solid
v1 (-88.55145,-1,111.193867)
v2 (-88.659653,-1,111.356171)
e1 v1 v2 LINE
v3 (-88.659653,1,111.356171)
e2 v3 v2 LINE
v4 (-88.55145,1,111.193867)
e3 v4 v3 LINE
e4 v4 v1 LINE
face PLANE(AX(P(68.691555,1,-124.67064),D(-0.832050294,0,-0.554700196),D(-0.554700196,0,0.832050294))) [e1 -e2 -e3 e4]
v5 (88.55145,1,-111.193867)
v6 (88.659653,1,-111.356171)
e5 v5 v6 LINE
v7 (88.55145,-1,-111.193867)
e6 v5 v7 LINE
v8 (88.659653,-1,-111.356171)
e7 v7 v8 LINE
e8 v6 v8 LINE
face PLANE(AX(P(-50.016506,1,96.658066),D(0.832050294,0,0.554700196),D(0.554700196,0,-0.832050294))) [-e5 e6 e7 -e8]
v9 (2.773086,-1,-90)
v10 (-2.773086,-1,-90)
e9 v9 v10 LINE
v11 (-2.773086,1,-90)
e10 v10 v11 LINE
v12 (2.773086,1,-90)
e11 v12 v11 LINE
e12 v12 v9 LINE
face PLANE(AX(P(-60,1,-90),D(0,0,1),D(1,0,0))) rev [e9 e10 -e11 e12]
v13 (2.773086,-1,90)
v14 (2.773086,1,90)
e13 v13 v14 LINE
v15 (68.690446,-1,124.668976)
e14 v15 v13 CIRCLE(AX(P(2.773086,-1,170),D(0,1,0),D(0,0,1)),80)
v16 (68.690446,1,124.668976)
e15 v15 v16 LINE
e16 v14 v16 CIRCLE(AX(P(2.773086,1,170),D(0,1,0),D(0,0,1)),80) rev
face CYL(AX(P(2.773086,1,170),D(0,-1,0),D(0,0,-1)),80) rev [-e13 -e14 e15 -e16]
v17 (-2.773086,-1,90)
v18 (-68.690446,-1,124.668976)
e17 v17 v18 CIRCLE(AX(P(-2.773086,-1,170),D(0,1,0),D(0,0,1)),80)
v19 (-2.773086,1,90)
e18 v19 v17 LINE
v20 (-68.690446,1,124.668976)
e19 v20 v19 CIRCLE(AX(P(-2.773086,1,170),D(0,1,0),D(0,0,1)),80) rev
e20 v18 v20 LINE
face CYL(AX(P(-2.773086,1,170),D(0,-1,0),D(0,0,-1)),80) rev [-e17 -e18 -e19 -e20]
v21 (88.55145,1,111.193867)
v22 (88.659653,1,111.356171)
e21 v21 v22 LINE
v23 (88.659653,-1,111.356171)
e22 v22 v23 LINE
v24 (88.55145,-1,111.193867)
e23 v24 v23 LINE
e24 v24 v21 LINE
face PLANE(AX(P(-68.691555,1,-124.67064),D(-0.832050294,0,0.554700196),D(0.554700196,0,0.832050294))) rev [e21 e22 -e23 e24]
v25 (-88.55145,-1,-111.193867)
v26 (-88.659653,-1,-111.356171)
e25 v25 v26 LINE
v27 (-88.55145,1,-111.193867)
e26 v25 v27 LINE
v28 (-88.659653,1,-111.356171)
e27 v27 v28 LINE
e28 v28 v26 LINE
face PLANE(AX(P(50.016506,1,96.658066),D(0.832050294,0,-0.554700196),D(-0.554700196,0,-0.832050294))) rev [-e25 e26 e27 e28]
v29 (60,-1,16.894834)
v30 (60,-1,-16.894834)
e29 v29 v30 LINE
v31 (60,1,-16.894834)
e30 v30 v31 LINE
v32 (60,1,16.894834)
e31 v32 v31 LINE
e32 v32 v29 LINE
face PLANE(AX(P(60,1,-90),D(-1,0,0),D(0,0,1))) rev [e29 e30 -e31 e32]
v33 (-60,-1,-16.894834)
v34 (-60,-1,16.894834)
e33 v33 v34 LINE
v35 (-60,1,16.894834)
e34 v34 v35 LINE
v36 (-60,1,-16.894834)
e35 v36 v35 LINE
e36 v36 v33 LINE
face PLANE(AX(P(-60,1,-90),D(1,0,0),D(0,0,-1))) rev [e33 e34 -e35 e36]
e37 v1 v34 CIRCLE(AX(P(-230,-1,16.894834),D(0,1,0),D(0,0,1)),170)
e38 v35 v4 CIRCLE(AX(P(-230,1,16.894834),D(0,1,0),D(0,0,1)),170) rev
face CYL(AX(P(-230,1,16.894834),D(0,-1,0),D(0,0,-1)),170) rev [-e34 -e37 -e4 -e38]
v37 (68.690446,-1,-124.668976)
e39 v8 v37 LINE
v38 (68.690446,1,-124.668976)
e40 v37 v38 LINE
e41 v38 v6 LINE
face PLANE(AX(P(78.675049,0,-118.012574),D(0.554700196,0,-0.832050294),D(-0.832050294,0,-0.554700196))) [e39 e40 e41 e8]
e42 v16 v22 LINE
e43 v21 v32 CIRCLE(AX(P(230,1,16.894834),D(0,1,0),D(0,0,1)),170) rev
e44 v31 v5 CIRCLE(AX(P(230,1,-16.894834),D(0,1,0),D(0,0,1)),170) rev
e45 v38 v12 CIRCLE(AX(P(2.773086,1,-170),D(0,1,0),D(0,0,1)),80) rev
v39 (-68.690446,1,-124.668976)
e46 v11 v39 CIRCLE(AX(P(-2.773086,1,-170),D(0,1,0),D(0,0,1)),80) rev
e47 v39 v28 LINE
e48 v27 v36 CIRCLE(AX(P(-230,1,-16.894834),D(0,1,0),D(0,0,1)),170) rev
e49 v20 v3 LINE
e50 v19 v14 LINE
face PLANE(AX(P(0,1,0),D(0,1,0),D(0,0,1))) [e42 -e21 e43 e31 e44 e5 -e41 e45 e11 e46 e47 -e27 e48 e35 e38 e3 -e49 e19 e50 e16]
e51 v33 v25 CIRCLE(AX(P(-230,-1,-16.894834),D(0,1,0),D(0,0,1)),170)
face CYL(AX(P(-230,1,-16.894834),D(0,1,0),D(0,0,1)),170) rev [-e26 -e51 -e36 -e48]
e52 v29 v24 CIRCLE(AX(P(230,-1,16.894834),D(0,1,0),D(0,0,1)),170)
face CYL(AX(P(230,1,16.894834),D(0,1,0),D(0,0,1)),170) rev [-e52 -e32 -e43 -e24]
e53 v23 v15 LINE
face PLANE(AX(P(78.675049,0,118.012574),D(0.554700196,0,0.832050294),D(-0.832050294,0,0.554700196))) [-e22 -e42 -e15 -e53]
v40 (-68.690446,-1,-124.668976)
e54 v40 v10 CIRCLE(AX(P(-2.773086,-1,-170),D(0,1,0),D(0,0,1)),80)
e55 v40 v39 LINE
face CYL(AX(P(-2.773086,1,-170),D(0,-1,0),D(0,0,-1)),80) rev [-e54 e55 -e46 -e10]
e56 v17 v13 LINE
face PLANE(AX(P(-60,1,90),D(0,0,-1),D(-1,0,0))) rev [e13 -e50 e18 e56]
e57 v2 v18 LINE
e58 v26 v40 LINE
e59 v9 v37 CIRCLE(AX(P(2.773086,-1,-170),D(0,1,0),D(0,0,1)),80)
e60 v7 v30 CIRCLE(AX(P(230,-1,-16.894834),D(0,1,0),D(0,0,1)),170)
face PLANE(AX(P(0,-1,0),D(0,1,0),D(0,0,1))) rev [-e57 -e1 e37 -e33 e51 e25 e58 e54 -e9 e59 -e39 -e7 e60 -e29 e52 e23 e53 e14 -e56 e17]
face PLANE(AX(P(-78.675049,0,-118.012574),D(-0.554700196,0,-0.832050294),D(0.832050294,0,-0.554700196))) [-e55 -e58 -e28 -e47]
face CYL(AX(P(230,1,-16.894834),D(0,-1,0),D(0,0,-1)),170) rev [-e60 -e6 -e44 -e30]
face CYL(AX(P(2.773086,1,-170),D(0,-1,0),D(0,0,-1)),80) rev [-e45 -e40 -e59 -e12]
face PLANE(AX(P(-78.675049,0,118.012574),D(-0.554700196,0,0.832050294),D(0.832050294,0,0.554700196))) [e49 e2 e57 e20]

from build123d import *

# Parameters (mm, degrees)
IZIM1_W                     = 120
IZIM1_H                     = 180
Y_KSEKLIK_EKSTR_ZYON1_DEPTH = 1
Y_KSEKLIK_EKSTR_ZYON3_REACH = 252.002
IZIM4_W                     = 24
IZIM4_H                     = 2
AYNALAMA2_COPY_1_REACH      = 252.002
AYNALAMA2_COPY_1_SKETCH_W   = 24
AYNALAMA2_COPY_1_SKETCH_H   = 2
RADYUS3_R                   = 80
RADYUS4_R                   = 80
RADYUS5_R                   = 170
RADYUS6_R                   = 170


with BuildPart() as part:
    # Çizim1 → Yükseklik-Ekstrüzyon1 (new, symmetric)
    with BuildSketch(Plane(origin=(0, 0, 0), x_dir=(1, 0, 0), z_dir=(0, 1, 0))):
        Rectangle(IZIM1_W, IZIM1_H)
    extrude(amount=Y_KSEKLIK_EKSTR_ZYON1_DEPTH, both=True)

    # Çizim4 → Yükseklik-Ekstrüzyon3 (add, up to next)
    with BuildSketch(Plane(origin=(78.675049056, 0, -118.012573584), x_dir=(-0.8320502943378438, 0, -0.5547001962252289), z_dir=(0.5547001962252289, 0, -0.8320502943378438)), mode=Mode.PRIVATE) as y_kseklik_ekstr_zyon3_sk1:
        Rectangle(IZIM4_W, IZIM4_H)
    y_kseklik_ekstr_zyon3_tool1 = extrude(y_kseklik_ekstr_zyon3_sk1.sketch, amount=-Y_KSEKLIK_EKSTR_ZYON3_REACH, mode=Mode.PRIVATE) - part.part
    y_kseklik_ekstr_zyon3 = y_kseklik_ekstr_zyon3_tool1.solids().sort_by_distance((78.675049, 0, -118.012574))[0]
    add(y_kseklik_ekstr_zyon3)

    # Aynalama1: Yükseklik-Ekstrüzyon3 across plane
    add(y_kseklik_ekstr_zyon3.mirror(Plane(origin=(0, 0, 0), x_dir=(0, 0, 1), z_dir=(1, 0, 0))))

    # Aynalama2: Yükseklik-Ekstrüzyon3 across plane
    add(y_kseklik_ekstr_zyon3.mirror(Plane.XY))

    # Aynalama2 copy 1 sketch → Aynalama2 copy 1 (add, up to next)
    with BuildSketch(Plane(origin=(-78.675049056, 0, 118.012573584), x_dir=(0.8320502943378438, 0, 0.5547001962252289), z_dir=(-0.5547001962252289, 0, 0.8320502943378438)), mode=Mode.PRIVATE) as aynalama2_copy_1_sk1:
        Rectangle(AYNALAMA2_COPY_1_SKETCH_W, AYNALAMA2_COPY_1_SKETCH_H)
    aynalama2_copy_1_tool1 = extrude(aynalama2_copy_1_sk1.sketch, amount=-AYNALAMA2_COPY_1_REACH, mode=Mode.PRIVATE) - part.part
    add(aynalama2_copy_1_tool1.solids().sort_by_distance((-78.675049, 0, 118.012574))[0])

    # Radyus3
    # the kernel refuses this fillet: 80 mm, written as the material it adds along each edge
    with BuildSketch(Plane(origin=(45.577794898, 1, -90), x_dir=(-1, 0, 0), z_dir=(0, -1, 0))) as radyus3_piece_1:
        with BuildLine():
            CenterArc((42.804708678, 80), RADYUS3_R, 214.516100583, 55.483899417)
            Line((-23.112650626, 34.668975939), (-24.430997812, 33.762355458))
            ThreePointArc((-24.430997812, 33.762355458), (-12.887605784, 16.446967656), (-1.331280471, -0.887520314))
            Line((-1.331280471, -0.887520314), (0, -1.6))
            Line((0, -1.6), (42.804708678, -1.6))
            Line((42.804708678, -1.6), (42.804708678, 0))
        make_face()
    extrude(amount=2)
    with BuildSketch(Plane(origin=(-45.577794898, 1, -90), x_dir=(-0.5547001962252296, 0, -0.8320502943378434), z_dir=(0, -1, 0))) as radyus3_piece_2:
        with BuildLine():
            CenterArc((42.820243244, 79.991686152), RADYUS3_R, 213.690067526, 55.483899417)
            Line((-23.743780303, 35.615670454), (-25.075060774, 34.72815014))
            Line((-25.075060774, 34.72815014), (-1.331280471, -0.887520314))
            Line((-1.331280471, -0.887520314), (0, -1.6))
            ThreePointArc((0, -1.6), (20.833461736, -1.6), (41.643857077, -1.599833723))
            Line((41.643857077, -1.599833723), (41.666923472, 0))
        make_face()
    extrude(amount=2)

    # Radyus4
    # the kernel refuses this fillet: 80 mm, written as the material it adds along each edge
    with BuildSketch(Plane(origin=(-45.577794898, 1, 90), x_dir=(1, 0, 0), z_dir=(0, -1, 0))) as radyus4_piece_1:
        with BuildLine():
            CenterArc((42.804708678, 80), RADYUS4_R, 214.516100583, 55.483899417)
            Line((-23.112650626, 34.668975939), (-24.430997812, 33.762355458))
            ThreePointArc((-24.430997812, 33.762355458), (-12.887605784, 16.446967656), (-1.331280471, -0.887520314))
            Line((-1.331280471, -0.887520314), (0, -1.6))
            Line((0, -1.6), (42.804708678, -1.6))
            Line((42.804708678, -1.6), (42.804708678, 0))
        make_face()
    extrude(amount=2)
    with BuildSketch(Plane(origin=(45.577794898, 1, 90), x_dir=(0.5547001962252287, 0, 0.8320502943378439), z_dir=(0, -1, 0))) as radyus4_piece_2:
        with BuildLine():
            CenterArc((42.820243244, 79.991686152), RADYUS4_R, 213.690067526, 55.483899417)
            Line((-23.743780303, 35.615670454), (-25.075060774, 34.72815014))
            Line((-25.075060774, 34.72815014), (-1.331280471, -0.887520314))
            Line((-1.331280471, -0.887520314), (0, -1.6))
            ThreePointArc((0, -1.6), (20.833461736, -1.6), (41.643857077, -1.599833723))
            Line((41.643857077, -1.599833723), (41.666923472, 0))
        make_face()
    extrude(amount=2)

    # Radyus5
    radyus5_edges = [part.edges().sort_by_distance(p)[0] for p in [
        (-60, 0, -68.366692347),
        (-60, 0, 68.366692347),
    ]]
    fillet(radyus5_edges, radius=RADYUS5_R)

    # Radyus6
    radyus6_edges = [part.edges().sort_by_distance(p)[0] for p in [
        (60, 0, -68.366692347),
        (60, 0, 68.366692347),
    ]]
    fillet(radyus6_edges, radius=RADYUS6_R)


solid = part.part
